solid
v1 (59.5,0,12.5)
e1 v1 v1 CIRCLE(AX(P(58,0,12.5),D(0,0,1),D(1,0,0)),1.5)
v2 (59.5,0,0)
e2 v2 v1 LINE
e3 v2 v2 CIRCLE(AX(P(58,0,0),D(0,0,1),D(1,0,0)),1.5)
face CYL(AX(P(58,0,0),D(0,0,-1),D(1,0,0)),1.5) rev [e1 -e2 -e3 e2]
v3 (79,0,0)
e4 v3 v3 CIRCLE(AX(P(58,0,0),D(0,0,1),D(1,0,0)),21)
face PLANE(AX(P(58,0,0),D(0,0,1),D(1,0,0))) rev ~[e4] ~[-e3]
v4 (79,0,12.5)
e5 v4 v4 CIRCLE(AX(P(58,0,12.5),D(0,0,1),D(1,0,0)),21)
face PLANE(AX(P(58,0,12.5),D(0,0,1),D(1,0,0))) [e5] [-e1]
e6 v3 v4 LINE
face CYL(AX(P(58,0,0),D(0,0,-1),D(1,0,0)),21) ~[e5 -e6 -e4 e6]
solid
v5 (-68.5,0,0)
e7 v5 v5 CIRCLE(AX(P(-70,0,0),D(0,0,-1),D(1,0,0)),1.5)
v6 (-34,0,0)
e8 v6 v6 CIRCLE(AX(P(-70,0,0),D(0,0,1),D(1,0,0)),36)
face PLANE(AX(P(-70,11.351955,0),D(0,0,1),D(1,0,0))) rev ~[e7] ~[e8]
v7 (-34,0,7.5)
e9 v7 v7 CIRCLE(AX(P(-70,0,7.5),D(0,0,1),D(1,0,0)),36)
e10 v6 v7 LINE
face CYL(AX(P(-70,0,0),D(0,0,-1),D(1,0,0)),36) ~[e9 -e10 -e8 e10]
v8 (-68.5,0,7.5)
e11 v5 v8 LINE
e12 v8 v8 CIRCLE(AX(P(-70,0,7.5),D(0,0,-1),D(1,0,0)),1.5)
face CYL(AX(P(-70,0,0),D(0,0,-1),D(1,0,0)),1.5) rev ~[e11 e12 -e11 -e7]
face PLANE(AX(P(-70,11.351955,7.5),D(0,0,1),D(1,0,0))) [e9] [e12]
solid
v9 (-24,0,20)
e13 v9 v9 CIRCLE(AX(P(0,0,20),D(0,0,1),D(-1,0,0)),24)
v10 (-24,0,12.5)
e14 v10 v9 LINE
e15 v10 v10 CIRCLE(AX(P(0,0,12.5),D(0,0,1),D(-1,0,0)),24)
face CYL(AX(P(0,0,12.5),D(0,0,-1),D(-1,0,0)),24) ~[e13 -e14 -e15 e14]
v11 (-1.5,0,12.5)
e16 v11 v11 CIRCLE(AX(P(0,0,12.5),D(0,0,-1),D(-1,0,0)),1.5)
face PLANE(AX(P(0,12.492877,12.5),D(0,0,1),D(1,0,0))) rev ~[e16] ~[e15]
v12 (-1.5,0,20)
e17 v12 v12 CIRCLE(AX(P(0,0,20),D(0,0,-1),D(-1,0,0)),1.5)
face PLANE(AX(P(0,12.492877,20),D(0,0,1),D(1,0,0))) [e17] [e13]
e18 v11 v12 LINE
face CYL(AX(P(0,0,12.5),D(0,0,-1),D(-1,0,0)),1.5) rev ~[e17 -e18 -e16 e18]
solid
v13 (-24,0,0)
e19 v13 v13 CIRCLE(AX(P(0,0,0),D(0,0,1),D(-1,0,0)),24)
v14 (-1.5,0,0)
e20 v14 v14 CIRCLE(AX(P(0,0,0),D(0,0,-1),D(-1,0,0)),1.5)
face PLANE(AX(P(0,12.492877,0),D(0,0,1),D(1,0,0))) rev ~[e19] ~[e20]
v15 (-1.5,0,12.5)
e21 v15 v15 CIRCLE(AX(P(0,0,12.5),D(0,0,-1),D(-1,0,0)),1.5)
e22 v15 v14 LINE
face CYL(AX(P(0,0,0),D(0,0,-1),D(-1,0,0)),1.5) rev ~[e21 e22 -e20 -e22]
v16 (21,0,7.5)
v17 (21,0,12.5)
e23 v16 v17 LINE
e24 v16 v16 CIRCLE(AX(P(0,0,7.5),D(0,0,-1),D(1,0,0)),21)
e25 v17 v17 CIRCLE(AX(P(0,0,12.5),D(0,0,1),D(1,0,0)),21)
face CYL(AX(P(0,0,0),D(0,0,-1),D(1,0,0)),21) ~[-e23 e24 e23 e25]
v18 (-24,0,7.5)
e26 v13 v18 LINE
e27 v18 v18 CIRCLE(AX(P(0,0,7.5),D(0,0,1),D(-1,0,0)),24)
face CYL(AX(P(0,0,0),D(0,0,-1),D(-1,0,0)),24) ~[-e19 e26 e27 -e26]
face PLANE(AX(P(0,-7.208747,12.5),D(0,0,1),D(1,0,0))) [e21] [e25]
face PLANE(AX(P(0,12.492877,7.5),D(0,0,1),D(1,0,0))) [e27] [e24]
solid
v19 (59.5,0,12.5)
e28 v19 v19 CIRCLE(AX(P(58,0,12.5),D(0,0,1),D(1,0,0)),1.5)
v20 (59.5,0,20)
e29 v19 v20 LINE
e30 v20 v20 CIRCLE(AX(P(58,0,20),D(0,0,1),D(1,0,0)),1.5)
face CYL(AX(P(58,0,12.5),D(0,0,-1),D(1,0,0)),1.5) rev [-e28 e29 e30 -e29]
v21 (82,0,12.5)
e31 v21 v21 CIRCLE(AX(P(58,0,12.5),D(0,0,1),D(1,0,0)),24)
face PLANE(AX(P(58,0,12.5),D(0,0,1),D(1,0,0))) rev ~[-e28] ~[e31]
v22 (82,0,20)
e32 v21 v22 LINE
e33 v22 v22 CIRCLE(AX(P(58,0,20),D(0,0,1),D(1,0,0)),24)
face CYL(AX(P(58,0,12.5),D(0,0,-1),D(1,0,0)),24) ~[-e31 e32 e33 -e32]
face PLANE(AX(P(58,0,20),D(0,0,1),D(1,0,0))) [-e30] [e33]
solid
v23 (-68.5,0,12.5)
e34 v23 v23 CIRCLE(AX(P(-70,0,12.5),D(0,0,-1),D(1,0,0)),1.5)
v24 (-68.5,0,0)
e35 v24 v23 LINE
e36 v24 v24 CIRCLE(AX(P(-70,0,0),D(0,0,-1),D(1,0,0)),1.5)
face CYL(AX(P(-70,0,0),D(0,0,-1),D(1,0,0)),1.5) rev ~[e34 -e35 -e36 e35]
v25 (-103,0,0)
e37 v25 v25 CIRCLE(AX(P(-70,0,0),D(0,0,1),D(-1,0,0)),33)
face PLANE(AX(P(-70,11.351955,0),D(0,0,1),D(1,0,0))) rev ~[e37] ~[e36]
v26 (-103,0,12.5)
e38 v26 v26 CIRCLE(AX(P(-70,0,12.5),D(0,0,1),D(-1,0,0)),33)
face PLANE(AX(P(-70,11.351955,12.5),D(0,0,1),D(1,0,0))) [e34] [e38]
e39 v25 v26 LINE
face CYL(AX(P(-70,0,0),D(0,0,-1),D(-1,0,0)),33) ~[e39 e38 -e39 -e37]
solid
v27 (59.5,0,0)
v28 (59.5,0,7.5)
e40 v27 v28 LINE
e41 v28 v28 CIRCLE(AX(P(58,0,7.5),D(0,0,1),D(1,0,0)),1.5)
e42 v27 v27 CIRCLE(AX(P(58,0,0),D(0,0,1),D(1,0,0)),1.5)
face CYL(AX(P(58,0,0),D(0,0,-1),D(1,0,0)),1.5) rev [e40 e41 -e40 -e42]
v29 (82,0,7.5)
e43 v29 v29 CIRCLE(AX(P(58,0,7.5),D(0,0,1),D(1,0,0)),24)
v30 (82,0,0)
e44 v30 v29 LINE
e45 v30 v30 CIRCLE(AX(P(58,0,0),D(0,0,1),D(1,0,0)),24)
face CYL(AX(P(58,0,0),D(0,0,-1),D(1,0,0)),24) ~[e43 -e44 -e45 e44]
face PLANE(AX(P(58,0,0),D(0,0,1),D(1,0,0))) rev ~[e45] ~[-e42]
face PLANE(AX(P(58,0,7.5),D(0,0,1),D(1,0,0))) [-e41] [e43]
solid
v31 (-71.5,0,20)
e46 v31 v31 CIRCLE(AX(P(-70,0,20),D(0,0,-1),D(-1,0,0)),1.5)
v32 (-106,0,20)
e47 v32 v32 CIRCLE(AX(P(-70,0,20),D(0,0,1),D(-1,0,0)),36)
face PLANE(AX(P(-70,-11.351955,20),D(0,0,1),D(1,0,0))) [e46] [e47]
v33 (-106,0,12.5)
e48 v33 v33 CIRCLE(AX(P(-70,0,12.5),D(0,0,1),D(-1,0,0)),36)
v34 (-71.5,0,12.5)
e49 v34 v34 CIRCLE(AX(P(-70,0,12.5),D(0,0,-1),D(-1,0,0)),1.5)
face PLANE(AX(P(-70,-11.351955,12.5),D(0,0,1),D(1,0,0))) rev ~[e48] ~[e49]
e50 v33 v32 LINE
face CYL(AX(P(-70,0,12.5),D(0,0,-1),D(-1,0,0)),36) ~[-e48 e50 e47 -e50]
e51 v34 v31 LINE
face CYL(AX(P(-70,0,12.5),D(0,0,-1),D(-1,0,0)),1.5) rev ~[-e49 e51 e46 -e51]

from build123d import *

# Parameters (mm, degrees)
F1_DEPTH = 7.5
F2_DEPTH = 12.5
F3_START = 12.5
F3_DEPTH = 7.5
F5_DEPTH = 7.5
F4_R     = 24
F4_R_2   = 21
F4_R_3   = 1.5
F6_DEPTH = 12.5
F7_START = 12.5
F7_DEPTH = 7.5


with BuildPart() as f1:
    # F0 (on Top) → F1 (new body)
    with BuildSketch(Plane.XY):
        with BuildLine():
            Line((21, 0), (24, 0))
            ThreePointArc((24, 0), (0, 24), (-24, 0))
            Line((-24, 0), (-21, 0))
            ThreePointArc((-21, 0), (0, 21), (21, 0))
        make_face()
        with BuildLine():
            ThreePointArc((-24, 0), (0, -24), (24, 0))
            Line((24, 0), (21, 0))
            ThreePointArc((21, 0), (0, -21), (-21, 0))
            Line((-21, 0), (-24, 0))
        make_face()
        with BuildLine():
            ThreePointArc((-21, 0), (0, -21), (21, 0))
            Line((21, 0), (1.5, 0))
            ThreePointArc((1.5, 0), (0, -1.5), (-1.5, 0))
            Line((-1.5, 0), (-21, 0))
        make_face()
        with BuildLine():
            Line((1.5, 0), (21, 0))
            ThreePointArc((21, 0), (0, 21), (-21, 0))
            Line((-21, 0), (-1.5, 0))
            ThreePointArc((-1.5, 0), (0, 1.5), (1.5, 0))
        make_face()
    extrude(amount=F1_DEPTH)

    # F0 (on Top) → F2 (join)
    with BuildSketch(Plane.XY):
        with BuildLine():
            ThreePointArc((-21, 0), (0, -21), (21, 0))
            Line((21, 0), (1.5, 0))
            ThreePointArc((1.5, 0), (0, -1.5), (-1.5, 0))
            Line((-1.5, 0), (-21, 0))
        make_face()
        with BuildLine():
            Line((1.5, 0), (21, 0))
            ThreePointArc((21, 0), (0, 21), (-21, 0))
            Line((-21, 0), (-1.5, 0))
            ThreePointArc((-1.5, 0), (0, 1.5), (1.5, 0))
        make_face()
    extrude(amount=F2_DEPTH)


with BuildPart() as f3:
    # F0 (on Top) → F3 (new body)
    with BuildSketch(Plane.XY.offset(F3_START)):
        with BuildLine():
            Line((21, 0), (24, 0))
            ThreePointArc((24, 0), (0, 24), (-24, 0))
            Line((-24, 0), (-21, 0))
            ThreePointArc((-21, 0), (0, 21), (21, 0))
        make_face()
        with BuildLine():
            ThreePointArc((-24, 0), (0, -24), (24, 0))
            Line((24, 0), (21, 0))
            ThreePointArc((21, 0), (0, -21), (-21, 0))
            Line((-21, 0), (-24, 0))
        make_face()
        with BuildLine():
            ThreePointArc((-21, 0), (0, -21), (21, 0))
            Line((21, 0), (1.5, 0))
            ThreePointArc((1.5, 0), (0, -1.5), (-1.5, 0))
            Line((-1.5, 0), (-21, 0))
        make_face()
        with BuildLine():
            Line((1.5, 0), (21, 0))
            ThreePointArc((21, 0), (0, 21), (-21, 0))
            Line((-21, 0), (-1.5, 0))
            ThreePointArc((-1.5, 0), (0, 1.5), (1.5, 0))
        make_face()
    extrude(amount=F3_DEPTH)


with BuildPart() as f5:
    # F4 (on Top) → F5 (new body)
    with BuildSketch(Plane.XY):
        with BuildLine():
            Line((-68.5, 0), (-37, 0))
            ThreePointArc((-37, 0), (-70, 33), (-103, 0))
            Line((-103, 0), (-71.5, 0))
            ThreePointArc((-71.5, 0), (-70, 1.5), (-68.5, 0))
        make_face()
        with BuildLine():
            ThreePointArc((-103, 0), (-70, -33), (-37, 0))
            Line((-37, 0), (-68.5, 0))
            ThreePointArc((-68.5, 0), (-70, -1.5), (-71.5, 0))
            Line((-71.5, 0), (-103, 0))
        make_face()
        with BuildLine():
            ThreePointArc((-106, 0), (-70, -36), (-34, 0))
            Line((-34, 0), (-37, 0))
            ThreePointArc((-37, 0), (-70, -33), (-103, 0))
            Line((-103, 0), (-106, 0))
        make_face()
        with BuildLine():
            Line((-37, 0), (-34, 0))
            ThreePointArc((-34, 0), (-70, 36), (-106, 0))
            Line((-106, 0), (-103, 0))
            ThreePointArc((-103, 0), (-70, 33), (-37, 0))
        make_face()
    extrude(amount=F5_DEPTH)


with BuildPart() as f5b:
    # F4 (on Top) → F5, piece 2 (new body)
    with BuildSketch(Plane.XY):
        with Locations((58, 0)):
            Circle(F4_R)
        with Locations((58, 0)):
            Circle(F4_R_2, mode=Mode.SUBTRACT)
        with Locations((58, 0)):
            Circle(F4_R_2)
        with Locations((58, 0)):
            Circle(F4_R_3, mode=Mode.SUBTRACT)
    extrude(amount=F5_DEPTH)


with BuildPart() as f6:
    # F4 (on Top) → F6 (new body)
    with BuildSketch(Plane.XY):
        with BuildLine():
            Line((-68.5, 0), (-37, 0))
            ThreePointArc((-37, 0), (-70, 33), (-103, 0))
            Line((-103, 0), (-71.5, 0))
            ThreePointArc((-71.5, 0), (-70, 1.5), (-68.5, 0))
        make_face()
        with BuildLine():
            ThreePointArc((-103, 0), (-70, -33), (-37, 0))
            Line((-37, 0), (-68.5, 0))
            ThreePointArc((-68.5, 0), (-70, -1.5), (-71.5, 0))
            Line((-71.5, 0), (-103, 0))
        make_face()
    extrude(amount=F6_DEPTH)


with BuildPart() as f6b:
    # F4 (on Top) → F6, piece 2 (new body)
    with BuildSketch(Plane.XY):
        with Locations((58, 0)):
            Circle(F4_R_2)
        with Locations((58, 0)):
            Circle(F4_R_3, mode=Mode.SUBTRACT)
    extrude(amount=F6_DEPTH)


with BuildPart() as f7:
    # F4 (on Top) → F7 (new body)
    with BuildSketch(Plane.XY.offset(F7_START)):
        with BuildLine():
            ThreePointArc((-103, 0), (-70, -33), (-37, 0))
            Line((-37, 0), (-68.5, 0))
            ThreePointArc((-68.5, 0), (-70, -1.5), (-71.5, 0))
            Line((-71.5, 0), (-103, 0))
        make_face()
        with BuildLine():
            Line((-68.5, 0), (-37, 0))
            ThreePointArc((-37, 0), (-70, 33), (-103, 0))
            Line((-103, 0), (-71.5, 0))
            ThreePointArc((-71.5, 0), (-70, 1.5), (-68.5, 0))
        make_face()
        with BuildLine():
            Line((-37, 0), (-34, 0))
            ThreePointArc((-34, 0), (-70, 36), (-106, 0))
            Line((-106, 0), (-103, 0))
            ThreePointArc((-103, 0), (-70, 33), (-37, 0))
        make_face()
        with BuildLine():
            ThreePointArc((-106, 0), (-70, -36), (-34, 0))
            Line((-34, 0), (-37, 0))
            ThreePointArc((-37, 0), (-70, -33), (-103, 0))
            Line((-103, 0), (-106, 0))
        make_face()
    extrude(amount=F7_DEPTH)


with BuildPart() as f7b:
    # F4 (on Top) → F7, piece 2 (new body)
    with BuildSketch(Plane.XY.offset(F7_START)):
        with Locations((58, 0)):
            Circle(F4_R)
        with Locations((58, 0)):
            Circle(F4_R_2, mode=Mode.SUBTRACT)
        with Locations((58, 0)):
            Circle(F4_R_2)
        with Locations((58, 0)):
            Circle(F4_R_3, mode=Mode.SUBTRACT)
    extrude(amount=F7_DEPTH)


solid = Compound([f1.part, f3.part, f5.part, f5b.part, f6.part, f6b.part, f7.part, f7b.part])
